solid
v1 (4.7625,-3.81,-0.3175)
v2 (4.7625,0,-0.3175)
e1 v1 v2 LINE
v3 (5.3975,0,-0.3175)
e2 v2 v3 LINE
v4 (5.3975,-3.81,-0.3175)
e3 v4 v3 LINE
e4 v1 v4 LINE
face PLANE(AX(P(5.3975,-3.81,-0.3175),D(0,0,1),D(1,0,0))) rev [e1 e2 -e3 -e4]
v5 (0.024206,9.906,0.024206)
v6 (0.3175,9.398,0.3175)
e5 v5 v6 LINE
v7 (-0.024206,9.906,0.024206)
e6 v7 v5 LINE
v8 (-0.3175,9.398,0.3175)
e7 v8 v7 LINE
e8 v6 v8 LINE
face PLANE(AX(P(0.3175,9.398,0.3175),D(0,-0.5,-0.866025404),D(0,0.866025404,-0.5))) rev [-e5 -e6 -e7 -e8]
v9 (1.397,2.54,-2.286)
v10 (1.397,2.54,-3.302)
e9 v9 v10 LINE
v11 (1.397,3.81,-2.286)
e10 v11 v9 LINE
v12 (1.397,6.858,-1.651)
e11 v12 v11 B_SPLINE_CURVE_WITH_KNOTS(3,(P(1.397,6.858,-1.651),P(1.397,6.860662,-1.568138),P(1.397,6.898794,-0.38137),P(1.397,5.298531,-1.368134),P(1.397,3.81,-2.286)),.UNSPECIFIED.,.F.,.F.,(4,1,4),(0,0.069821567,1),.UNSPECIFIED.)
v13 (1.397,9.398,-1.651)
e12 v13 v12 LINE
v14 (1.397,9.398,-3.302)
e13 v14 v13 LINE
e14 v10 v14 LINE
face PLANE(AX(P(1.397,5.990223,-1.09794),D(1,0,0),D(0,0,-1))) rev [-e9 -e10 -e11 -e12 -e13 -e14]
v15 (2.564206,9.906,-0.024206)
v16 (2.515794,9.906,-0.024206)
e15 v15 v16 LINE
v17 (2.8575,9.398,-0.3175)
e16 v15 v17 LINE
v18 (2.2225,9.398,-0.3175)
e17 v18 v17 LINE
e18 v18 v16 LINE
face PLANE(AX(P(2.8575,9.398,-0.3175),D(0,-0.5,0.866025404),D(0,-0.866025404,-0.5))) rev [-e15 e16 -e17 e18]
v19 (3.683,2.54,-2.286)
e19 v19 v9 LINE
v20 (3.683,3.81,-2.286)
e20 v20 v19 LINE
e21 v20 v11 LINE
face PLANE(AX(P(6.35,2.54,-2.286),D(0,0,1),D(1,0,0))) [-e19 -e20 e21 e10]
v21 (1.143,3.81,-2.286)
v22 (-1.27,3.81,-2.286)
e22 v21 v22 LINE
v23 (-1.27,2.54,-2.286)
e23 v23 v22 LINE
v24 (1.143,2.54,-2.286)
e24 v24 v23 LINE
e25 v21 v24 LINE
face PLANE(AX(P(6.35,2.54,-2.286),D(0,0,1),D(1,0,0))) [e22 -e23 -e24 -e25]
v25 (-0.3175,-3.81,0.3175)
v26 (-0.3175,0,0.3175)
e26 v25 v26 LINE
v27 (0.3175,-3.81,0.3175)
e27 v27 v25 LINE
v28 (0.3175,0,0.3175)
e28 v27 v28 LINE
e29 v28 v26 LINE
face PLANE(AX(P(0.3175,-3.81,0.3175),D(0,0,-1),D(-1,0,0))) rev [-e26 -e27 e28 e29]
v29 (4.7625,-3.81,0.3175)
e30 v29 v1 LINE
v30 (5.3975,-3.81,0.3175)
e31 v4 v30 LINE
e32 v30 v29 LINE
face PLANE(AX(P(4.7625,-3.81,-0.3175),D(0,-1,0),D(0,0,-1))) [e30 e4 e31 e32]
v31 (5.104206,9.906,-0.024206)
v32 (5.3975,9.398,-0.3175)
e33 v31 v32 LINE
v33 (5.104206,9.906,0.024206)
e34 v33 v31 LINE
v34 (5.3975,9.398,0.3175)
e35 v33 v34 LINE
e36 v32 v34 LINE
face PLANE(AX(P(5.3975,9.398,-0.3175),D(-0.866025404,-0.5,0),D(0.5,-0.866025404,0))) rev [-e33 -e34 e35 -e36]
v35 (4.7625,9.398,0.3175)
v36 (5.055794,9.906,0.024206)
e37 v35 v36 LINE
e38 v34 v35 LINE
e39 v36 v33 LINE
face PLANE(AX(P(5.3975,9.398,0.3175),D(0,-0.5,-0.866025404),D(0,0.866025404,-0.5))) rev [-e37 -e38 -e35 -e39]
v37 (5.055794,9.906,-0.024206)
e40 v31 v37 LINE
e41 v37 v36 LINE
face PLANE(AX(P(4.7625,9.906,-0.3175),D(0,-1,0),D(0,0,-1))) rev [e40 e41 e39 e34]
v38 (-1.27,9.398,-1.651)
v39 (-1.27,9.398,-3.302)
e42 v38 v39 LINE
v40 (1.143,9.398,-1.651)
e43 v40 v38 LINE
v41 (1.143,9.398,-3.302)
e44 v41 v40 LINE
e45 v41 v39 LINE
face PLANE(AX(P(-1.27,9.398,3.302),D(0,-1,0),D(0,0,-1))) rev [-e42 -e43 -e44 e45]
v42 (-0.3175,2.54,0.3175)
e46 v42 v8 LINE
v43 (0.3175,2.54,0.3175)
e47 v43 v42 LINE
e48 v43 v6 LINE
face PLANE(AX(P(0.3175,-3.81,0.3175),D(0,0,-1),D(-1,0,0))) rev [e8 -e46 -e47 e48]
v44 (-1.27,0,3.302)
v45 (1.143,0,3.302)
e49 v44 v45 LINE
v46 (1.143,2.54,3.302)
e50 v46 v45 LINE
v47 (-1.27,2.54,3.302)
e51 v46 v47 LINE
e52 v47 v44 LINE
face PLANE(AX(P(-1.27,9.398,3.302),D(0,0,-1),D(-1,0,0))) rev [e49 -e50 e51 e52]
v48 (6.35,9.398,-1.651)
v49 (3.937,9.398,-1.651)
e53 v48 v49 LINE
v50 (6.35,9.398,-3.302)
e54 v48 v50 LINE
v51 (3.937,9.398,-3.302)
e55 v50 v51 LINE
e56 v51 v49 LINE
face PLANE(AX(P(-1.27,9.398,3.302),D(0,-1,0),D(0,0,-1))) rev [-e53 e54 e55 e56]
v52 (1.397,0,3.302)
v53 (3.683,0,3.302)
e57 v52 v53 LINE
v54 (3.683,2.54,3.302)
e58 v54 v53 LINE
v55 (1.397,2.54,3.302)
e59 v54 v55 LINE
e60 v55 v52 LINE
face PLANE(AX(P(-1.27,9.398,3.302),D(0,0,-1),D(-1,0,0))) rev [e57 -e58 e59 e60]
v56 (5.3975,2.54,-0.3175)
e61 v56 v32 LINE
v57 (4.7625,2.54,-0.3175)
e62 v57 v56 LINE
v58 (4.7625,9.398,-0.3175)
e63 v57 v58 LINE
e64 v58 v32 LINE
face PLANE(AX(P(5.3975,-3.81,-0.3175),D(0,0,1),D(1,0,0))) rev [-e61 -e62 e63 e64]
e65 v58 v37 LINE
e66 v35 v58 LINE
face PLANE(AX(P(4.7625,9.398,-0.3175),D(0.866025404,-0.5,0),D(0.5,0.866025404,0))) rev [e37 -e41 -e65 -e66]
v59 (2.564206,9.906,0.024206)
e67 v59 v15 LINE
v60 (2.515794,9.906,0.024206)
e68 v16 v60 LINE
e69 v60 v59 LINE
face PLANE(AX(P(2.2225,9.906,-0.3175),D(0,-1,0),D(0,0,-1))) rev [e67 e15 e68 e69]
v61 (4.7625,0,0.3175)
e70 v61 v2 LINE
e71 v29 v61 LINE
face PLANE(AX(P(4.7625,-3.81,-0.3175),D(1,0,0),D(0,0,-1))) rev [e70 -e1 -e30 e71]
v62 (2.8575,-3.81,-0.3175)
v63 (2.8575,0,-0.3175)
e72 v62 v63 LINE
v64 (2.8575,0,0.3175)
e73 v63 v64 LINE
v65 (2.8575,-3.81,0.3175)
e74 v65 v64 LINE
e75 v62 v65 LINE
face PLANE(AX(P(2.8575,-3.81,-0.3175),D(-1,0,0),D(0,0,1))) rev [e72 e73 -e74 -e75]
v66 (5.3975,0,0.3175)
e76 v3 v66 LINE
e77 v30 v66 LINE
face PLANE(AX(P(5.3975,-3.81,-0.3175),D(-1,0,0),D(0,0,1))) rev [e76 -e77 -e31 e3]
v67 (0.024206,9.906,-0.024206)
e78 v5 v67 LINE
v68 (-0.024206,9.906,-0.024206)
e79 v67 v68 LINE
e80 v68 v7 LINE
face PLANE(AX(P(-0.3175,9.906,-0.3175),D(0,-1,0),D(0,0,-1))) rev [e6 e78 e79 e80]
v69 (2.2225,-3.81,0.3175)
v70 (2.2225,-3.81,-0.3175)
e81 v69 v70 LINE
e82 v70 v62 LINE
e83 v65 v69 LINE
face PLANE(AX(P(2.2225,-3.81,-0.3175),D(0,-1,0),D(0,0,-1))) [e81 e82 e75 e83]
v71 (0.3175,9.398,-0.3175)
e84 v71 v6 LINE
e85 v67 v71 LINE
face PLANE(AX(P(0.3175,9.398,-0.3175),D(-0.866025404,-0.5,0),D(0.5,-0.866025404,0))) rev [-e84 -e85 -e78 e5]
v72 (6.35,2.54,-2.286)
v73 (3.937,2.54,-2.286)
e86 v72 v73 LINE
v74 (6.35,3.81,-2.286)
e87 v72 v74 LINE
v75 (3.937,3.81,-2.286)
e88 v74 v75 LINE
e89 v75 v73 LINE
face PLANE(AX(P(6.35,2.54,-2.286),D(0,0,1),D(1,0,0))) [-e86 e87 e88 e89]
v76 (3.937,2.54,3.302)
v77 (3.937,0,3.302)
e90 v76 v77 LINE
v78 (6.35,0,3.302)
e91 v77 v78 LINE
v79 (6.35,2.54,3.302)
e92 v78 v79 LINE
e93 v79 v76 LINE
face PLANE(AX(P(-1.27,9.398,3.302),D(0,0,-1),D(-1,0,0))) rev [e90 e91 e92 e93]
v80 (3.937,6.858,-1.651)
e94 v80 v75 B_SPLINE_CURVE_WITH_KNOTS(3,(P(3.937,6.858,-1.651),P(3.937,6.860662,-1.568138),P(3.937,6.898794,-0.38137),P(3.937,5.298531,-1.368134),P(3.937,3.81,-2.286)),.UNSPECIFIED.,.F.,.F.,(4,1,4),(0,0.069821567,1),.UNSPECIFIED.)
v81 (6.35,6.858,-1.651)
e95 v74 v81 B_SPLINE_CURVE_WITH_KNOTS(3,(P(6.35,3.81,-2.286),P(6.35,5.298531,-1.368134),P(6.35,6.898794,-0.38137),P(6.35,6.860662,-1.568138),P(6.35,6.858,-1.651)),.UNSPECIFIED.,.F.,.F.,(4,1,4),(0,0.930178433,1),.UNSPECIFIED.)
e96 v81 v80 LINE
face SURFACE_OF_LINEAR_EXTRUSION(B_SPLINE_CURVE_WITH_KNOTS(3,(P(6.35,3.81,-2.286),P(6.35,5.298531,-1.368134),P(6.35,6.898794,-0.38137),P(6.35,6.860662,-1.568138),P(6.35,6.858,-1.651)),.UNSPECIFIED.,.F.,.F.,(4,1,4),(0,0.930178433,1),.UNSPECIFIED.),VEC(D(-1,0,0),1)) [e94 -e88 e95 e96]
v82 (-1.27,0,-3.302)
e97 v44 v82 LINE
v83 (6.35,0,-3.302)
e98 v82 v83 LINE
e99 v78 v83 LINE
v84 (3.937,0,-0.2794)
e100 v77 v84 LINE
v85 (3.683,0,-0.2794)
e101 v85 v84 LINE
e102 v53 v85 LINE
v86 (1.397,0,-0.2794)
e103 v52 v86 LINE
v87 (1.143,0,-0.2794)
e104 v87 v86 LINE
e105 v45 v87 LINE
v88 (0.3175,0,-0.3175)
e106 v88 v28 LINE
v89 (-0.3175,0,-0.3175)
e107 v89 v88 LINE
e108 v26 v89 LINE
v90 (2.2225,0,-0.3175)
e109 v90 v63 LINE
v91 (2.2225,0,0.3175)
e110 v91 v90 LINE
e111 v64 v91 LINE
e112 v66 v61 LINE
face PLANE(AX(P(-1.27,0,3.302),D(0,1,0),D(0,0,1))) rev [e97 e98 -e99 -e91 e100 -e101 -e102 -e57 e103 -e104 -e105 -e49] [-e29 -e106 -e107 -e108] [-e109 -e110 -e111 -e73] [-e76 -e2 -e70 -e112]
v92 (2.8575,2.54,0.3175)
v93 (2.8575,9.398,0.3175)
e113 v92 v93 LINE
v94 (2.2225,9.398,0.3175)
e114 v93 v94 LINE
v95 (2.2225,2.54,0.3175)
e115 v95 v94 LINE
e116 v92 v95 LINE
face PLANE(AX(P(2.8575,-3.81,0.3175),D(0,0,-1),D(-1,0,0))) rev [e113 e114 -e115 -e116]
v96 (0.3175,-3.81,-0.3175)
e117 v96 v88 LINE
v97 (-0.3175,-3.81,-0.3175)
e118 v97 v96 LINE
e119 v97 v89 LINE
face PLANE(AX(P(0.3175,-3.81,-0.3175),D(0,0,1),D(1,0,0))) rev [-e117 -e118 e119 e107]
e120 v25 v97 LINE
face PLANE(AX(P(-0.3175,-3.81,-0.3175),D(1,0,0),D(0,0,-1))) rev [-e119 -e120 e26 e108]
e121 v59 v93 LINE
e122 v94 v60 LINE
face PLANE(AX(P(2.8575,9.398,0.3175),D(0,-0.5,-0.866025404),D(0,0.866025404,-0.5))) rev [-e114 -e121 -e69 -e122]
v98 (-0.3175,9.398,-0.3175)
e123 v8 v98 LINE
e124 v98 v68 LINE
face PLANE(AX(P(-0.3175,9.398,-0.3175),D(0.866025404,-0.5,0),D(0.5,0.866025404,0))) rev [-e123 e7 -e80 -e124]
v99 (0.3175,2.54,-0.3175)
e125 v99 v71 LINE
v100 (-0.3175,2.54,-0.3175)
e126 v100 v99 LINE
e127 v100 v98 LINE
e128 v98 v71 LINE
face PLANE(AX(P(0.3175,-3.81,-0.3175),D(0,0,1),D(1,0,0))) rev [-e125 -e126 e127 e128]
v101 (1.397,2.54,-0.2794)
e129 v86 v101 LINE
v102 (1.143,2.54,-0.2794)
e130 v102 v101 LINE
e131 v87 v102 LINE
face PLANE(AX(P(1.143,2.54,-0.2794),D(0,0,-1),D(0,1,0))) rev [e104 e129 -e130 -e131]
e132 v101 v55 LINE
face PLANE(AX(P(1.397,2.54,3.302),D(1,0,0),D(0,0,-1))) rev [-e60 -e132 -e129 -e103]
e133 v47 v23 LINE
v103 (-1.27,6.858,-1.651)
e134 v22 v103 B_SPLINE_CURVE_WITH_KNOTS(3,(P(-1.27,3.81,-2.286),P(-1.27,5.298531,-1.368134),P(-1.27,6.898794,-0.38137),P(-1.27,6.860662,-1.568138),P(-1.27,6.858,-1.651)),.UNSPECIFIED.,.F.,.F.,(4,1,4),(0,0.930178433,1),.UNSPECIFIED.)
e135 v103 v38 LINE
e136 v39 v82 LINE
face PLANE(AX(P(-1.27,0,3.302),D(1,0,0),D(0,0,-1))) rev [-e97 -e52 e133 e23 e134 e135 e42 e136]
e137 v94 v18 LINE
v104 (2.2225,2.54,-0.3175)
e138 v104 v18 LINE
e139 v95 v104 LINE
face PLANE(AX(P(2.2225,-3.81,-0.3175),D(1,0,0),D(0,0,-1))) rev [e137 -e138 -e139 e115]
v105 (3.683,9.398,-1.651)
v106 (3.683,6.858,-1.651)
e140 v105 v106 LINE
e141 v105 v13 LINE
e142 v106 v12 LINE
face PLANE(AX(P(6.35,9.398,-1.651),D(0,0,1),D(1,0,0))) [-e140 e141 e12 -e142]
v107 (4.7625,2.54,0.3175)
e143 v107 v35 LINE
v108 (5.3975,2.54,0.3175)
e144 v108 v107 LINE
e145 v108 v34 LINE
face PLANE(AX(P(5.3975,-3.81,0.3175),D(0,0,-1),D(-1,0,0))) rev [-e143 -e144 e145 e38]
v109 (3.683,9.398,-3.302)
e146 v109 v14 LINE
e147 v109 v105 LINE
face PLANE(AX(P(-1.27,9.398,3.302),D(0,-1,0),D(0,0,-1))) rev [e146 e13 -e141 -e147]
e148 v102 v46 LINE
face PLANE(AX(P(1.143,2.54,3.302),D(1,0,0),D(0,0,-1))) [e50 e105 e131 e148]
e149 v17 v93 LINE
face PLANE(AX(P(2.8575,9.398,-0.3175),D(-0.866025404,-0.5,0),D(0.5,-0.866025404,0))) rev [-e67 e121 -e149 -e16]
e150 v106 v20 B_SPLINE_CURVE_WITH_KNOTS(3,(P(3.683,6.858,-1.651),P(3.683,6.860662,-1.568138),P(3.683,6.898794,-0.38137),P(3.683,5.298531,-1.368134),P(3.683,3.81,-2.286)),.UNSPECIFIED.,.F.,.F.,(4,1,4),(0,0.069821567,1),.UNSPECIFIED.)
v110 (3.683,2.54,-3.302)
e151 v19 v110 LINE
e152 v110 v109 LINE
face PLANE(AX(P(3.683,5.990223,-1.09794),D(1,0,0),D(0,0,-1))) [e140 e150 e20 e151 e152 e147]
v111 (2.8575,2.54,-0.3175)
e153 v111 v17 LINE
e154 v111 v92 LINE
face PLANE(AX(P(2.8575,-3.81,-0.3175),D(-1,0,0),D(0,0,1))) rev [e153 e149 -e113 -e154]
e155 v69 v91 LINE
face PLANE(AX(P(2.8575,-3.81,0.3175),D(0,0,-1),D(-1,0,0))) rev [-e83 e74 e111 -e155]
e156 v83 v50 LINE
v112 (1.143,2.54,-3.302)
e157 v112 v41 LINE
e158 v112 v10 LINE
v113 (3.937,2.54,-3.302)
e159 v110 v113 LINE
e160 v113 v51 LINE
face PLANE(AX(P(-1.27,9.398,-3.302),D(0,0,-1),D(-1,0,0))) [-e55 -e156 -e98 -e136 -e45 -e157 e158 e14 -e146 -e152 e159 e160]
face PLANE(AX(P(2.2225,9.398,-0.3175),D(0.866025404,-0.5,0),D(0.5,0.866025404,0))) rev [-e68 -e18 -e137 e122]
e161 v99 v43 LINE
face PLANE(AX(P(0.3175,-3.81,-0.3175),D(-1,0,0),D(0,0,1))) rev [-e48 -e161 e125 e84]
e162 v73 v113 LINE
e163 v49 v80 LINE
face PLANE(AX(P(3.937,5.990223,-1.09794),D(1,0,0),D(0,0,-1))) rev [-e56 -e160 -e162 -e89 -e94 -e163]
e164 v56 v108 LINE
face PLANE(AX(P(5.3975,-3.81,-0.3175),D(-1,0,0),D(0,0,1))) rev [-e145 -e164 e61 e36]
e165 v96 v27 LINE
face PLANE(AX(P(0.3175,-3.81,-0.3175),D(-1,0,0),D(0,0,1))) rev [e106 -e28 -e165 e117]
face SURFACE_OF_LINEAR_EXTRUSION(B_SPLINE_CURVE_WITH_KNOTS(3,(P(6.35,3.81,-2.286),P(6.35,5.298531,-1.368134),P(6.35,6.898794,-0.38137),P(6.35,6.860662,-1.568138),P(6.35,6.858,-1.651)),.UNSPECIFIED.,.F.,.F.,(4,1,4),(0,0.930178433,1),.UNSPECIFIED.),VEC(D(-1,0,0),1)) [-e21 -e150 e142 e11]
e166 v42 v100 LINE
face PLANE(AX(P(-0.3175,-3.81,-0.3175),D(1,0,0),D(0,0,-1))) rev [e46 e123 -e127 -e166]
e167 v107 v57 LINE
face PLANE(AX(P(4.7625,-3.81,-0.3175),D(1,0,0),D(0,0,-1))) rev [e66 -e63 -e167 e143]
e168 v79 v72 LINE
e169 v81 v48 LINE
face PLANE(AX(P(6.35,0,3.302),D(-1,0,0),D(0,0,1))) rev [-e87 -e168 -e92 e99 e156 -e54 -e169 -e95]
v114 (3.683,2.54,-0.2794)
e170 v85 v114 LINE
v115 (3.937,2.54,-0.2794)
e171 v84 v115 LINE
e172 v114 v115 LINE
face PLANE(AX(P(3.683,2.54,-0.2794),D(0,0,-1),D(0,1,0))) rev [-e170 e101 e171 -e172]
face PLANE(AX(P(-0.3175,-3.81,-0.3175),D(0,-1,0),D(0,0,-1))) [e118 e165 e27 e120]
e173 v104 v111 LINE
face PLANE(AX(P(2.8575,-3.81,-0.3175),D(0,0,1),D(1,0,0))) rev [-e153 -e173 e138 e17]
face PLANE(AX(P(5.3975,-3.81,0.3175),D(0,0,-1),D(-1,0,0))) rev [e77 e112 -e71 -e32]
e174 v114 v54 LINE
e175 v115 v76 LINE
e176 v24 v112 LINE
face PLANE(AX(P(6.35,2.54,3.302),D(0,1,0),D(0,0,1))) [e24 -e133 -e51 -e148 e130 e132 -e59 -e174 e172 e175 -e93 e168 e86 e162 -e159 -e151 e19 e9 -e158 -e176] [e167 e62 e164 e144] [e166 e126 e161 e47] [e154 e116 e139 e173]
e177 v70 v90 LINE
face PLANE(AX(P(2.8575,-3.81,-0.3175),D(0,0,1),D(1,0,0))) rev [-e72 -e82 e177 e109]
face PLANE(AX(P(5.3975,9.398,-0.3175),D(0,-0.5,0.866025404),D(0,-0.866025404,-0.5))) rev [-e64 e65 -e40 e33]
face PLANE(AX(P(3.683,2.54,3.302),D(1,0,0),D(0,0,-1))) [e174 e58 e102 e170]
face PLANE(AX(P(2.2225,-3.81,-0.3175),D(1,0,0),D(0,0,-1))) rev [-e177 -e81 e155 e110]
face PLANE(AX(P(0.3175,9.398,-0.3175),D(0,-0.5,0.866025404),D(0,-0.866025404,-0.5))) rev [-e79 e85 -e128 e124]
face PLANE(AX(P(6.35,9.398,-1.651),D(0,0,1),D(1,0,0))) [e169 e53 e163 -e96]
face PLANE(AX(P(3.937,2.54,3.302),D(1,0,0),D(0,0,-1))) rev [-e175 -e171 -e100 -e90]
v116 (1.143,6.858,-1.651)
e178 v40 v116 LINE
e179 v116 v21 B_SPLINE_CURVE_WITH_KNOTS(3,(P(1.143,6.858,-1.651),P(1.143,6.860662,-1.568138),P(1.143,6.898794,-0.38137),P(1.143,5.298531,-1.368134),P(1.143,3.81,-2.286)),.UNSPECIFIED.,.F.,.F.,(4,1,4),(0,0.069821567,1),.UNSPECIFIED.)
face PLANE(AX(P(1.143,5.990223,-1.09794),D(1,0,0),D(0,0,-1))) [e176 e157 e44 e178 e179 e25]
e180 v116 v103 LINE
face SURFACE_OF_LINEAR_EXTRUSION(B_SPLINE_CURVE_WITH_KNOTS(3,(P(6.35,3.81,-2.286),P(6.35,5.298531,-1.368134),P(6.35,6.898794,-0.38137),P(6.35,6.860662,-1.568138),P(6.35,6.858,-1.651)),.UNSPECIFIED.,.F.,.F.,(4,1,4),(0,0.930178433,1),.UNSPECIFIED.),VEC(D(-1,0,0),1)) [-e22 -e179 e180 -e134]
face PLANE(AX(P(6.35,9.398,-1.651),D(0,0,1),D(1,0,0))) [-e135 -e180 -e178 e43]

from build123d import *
from OCP.BRepFilletAPI import BRepFilletAPI_MakeChamfer

# Parameters (mm, degrees)
BASE_EXTRUDE_DEPTH          = 3.302
BASE_EXTRUDE_DEPTH_BACK     = 3.302
SKETCH3_W                   = 7.62
SKETCH3_H                   = 9.398
CUT_EXTRUDE1_START          = -7.62
CUT_EXTRUDE1_DEPTH          = 7.62
SKETCH5_W                   = 3.5814
SKETCH5_H                   = 2.54
CUT_EXTRUDE2_DEPTH          = 0.127
BOSS_EXTRUDE1_START         = -9.906
SKETCH6_W                   = 0.635
SKETCH6_H                   = 0.635
BOSS_EXTRUDE1_DEPTH         = 13.716
CHAMFER1_SIZE               = 0.508
CHAMFER1_SIZE2              = 0.293293937
LPATTERN2_COUNT             = 3
LPATTERN2_PITCH             = 2.54
CHAMFER1_OF_LPATTERN2_SIZE  = 0.508
CHAMFER1_OF_LPATTERN2_SIZE2 = 0.293293937
LPATTERN3_COUNT             = 2
LPATTERN3_PITCH             = 2.54


# Read off the part's stored shape, not the designer's step: Cut-Extrude1
with BuildPart() as part:
    # Sketch3 → Base-Extrude (new, two sides: drawn at the far end of the back side and taken through both)
    with BuildSketch(Plane.XY.offset(-BASE_EXTRUDE_DEPTH_BACK)):
        with Locations((2.54, 4.699)):
            Rectangle(SKETCH3_W, SKETCH3_H)
    extrude(amount=BASE_EXTRUDE_DEPTH + BASE_EXTRUDE_DEPTH_BACK)

    # Cut-Extrude1 outline → Cut-Extrude1 (cut)
    with BuildSketch(Plane.ZY.offset(1.27).offset(CUT_EXTRUDE1_START)):
        with BuildLine():
            add(Edge.make_bspline(
                [(-2.286, 3.81), (-1.368133743, 5.298530644), (-0.381370103, 6.898794196), (-1.568138006, 6.86066242), (-1.651, 6.858)],
                knots=[0, 0, 0, 0, 0.930178433, 1, 1, 1, 1], degree=3))
            Line((-2.286, 3.81), (-2.286, 2.54))
            Line((-2.286, 2.54), (3.302, 2.54))
            Line((3.302, 2.54), (3.302, 9.398))
            Line((3.302, 9.398), (-1.651, 9.398))
            Line((-1.651, 9.398), (-1.651, 6.858))
        make_face()
    extrude(amount=CUT_EXTRUDE1_DEPTH, mode=Mode.SUBTRACT)

    # Sketch5 → Cut-Extrude2 (cut, symmetric)
    with BuildSketch(Plane(origin=(1.27, 0, 0), x_dir=(0, 0, -1), z_dir=(1, 0, 0))):
        with Locations((-1.5113, 1.27)):
            Rectangle(SKETCH5_W, SKETCH5_H)
        with BuildLine():
            Line((3.302, 2.54), (3.302, 9.398))
            Line((3.302, 9.398), (1.651, 9.398))
            Line((1.651, 9.398), (1.651, 6.858))
            add(Edge.make_bspline(
                [(2.286, 3.81), (1.368133743, 5.298530644), (0.381370103, 6.898794196), (1.568138006, 6.86066242), (1.651, 6.858)],
                knots=[0, 0, 0, 0, 0.930178433, 1, 1, 1, 1], degree=3))
            Line((2.286, 3.81), (2.286, 2.54))
            Line((2.286, 2.54), (3.302, 2.54))
        make_face()
    cut_extrude2 = extrude(amount=CUT_EXTRUDE2_DEPTH, both=True, mode=Mode.SUBTRACT)

    # Sketch6 → Boss-Extrude1 (add)
    with BuildSketch(Plane.XZ.offset(BOSS_EXTRUDE1_START)):
        Rectangle(SKETCH6_W, SKETCH6_H)
    boss_extrude1 = extrude(amount=BOSS_EXTRUDE1_DEPTH)

    # Chamfer1: one chamfer whose edges measure the first distance from different faces: ONE call of the kernel's chamfer builder (chamfer() names one face for all edges)
    chamfer1_edges_1 = [part.edges().sort_by_distance(p)[0] for p in [
        (-0.3175, 9.906, 0),
    ]]
    chamfer1_side_1 = [part.faces().sort_by_distance(p)[0] for p in [
        (-0.3175, 6.223, 0),
    ]]
    chamfer1_edges_2 = [part.edges().sort_by_distance(p)[0] for p in [
        (0, 9.906, -0.3175),
    ]]
    chamfer1_side_2 = [part.faces().sort_by_distance(p)[0] for p in [
        (0, 6.223, -0.3175),
    ]]
    chamfer1_edges_3 = [part.edges().sort_by_distance(p)[0] for p in [
        (0.3175, 9.906, 0),
    ]]
    chamfer1_side_3 = [part.faces().sort_by_distance(p)[0] for p in [
        (0.3175, 6.223, 0),
    ]]
    chamfer1_edges_4 = [part.edges().sort_by_distance(p)[0] for p in [
        (0, 9.906, 0.3175),
    ]]
    chamfer1_side_4 = [part.faces().sort_by_distance(p)[0] for p in [
        (0, 6.223, 0.3175),
    ]]
    chamfer1 = BRepFilletAPI_MakeChamfer(part.part.solid().wrapped)
    for e in chamfer1_edges_1:
        chamfer1.Add(CHAMFER1_SIZE, CHAMFER1_SIZE2, e.wrapped, chamfer1_side_1[0].wrapped)  # the first distance lies on this face
    for e in chamfer1_edges_2:
        chamfer1.Add(CHAMFER1_SIZE, CHAMFER1_SIZE2, e.wrapped, chamfer1_side_2[0].wrapped)  # the first distance lies on this face
    for e in chamfer1_edges_3:
        chamfer1.Add(CHAMFER1_SIZE, CHAMFER1_SIZE2, e.wrapped, chamfer1_side_3[0].wrapped)  # the first distance lies on this face
    for e in chamfer1_edges_4:
        chamfer1.Add(CHAMFER1_SIZE, CHAMFER1_SIZE2, e.wrapped, chamfer1_side_4[0].wrapped)  # the first distance lies on this face
    add(Compound.cast(chamfer1.Shape()), mode=Mode.REPLACE)

    # LPattern2: Boss-Extrude1 ×3
    with Locations(*[(i * LPATTERN2_PITCH, 0, 0) for i in range(1, LPATTERN2_COUNT)]):
        add(boss_extrude1)

    # Chamfer1 of LPattern2: one chamfer whose edges measure the first distance from different faces: ONE call of the kernel's chamfer builder (chamfer() names one face for all edges)
    chamfer1_of_lpattern2_edges_1 = [part.edges().sort_by_distance(p)[0] for p in [
        (2.2225, 9.906, 0),
    ]]
    chamfer1_of_lpattern2_side_1 = [part.faces().sort_by_distance(p)[0] for p in [
        (2.2225, 6.223, 0),
    ]]
    chamfer1_of_lpattern2_edges_2 = [part.edges().sort_by_distance(p)[0] for p in [
        (2.54, 9.906, -0.3175),
    ]]
    chamfer1_of_lpattern2_side_2 = [part.faces().sort_by_distance(p)[0] for p in [
        (2.54, 6.223, -0.3175),
    ]]
    chamfer1_of_lpattern2_edges_3 = [part.edges().sort_by_distance(p)[0] for p in [
        (2.8575, 9.906, 0),
    ]]
    chamfer1_of_lpattern2_side_3 = [part.faces().sort_by_distance(p)[0] for p in [
        (2.8575, 6.223, 0),
    ]]
    chamfer1_of_lpattern2_edges_4 = [part.edges().sort_by_distance(p)[0] for p in [
        (2.54, 9.906, 0.3175),
    ]]
    chamfer1_of_lpattern2_side_4 = [part.faces().sort_by_distance(p)[0] for p in [
        (2.54, 6.223, 0.3175),
    ]]
    chamfer1_of_lpattern2_edges_5 = [part.edges().sort_by_distance(p)[0] for p in [
        (4.7625, 9.906, 0),
    ]]
    chamfer1_of_lpattern2_side_5 = [part.faces().sort_by_distance(p)[0] for p in [
        (4.7625, 6.223, 0),
    ]]
    chamfer1_of_lpattern2_edges_6 = [part.edges().sort_by_distance(p)[0] for p in [
        (5.08, 9.906, -0.3175),
    ]]
    chamfer1_of_lpattern2_side_6 = [part.faces().sort_by_distance(p)[0] for p in [
        (5.08, 6.223, -0.3175),
    ]]
    chamfer1_of_lpattern2_edges_7 = [part.edges().sort_by_distance(p)[0] for p in [
        (5.3975, 9.906, 0),
    ]]
    chamfer1_of_lpattern2_side_7 = [part.faces().sort_by_distance(p)[0] for p in [
        (5.3975, 6.223, 0),
    ]]
    chamfer1_of_lpattern2_edges_8 = [part.edges().sort_by_distance(p)[0] for p in [
        (5.08, 9.906, 0.3175),
    ]]
    chamfer1_of_lpattern2_side_8 = [part.faces().sort_by_distance(p)[0] for p in [
        (5.08, 6.223, 0.3175),
    ]]
    chamfer1_of_lpattern2 = BRepFilletAPI_MakeChamfer(part.part.solid().wrapped)
    for e in chamfer1_of_lpattern2_edges_1:
        chamfer1_of_lpattern2.Add(CHAMFER1_OF_LPATTERN2_SIZE, CHAMFER1_OF_LPATTERN2_SIZE2, e.wrapped, chamfer1_of_lpattern2_side_1[0].wrapped)  # the first distance lies on this face
    for e in chamfer1_of_lpattern2_edges_2:
        chamfer1_of_lpattern2.Add(CHAMFER1_OF_LPATTERN2_SIZE, CHAMFER1_OF_LPATTERN2_SIZE2, e.wrapped, chamfer1_of_lpattern2_side_2[0].wrapped)  # the first distance lies on this face
    for e in chamfer1_of_lpattern2_edges_3:
        chamfer1_of_lpattern2.Add(CHAMFER1_OF_LPATTERN2_SIZE, CHAMFER1_OF_LPATTERN2_SIZE2, e.wrapped, chamfer1_of_lpattern2_side_3[0].wrapped)  # the first distance lies on this face
    for e in chamfer1_of_lpattern2_edges_4:
        chamfer1_of_lpattern2.Add(CHAMFER1_OF_LPATTERN2_SIZE, CHAMFER1_OF_LPATTERN2_SIZE2, e.wrapped, chamfer1_of_lpattern2_side_4[0].wrapped)  # the first distance lies on this face
    for e in chamfer1_of_lpattern2_edges_5:
        chamfer1_of_lpattern2.Add(CHAMFER1_OF_LPATTERN2_SIZE, CHAMFER1_OF_LPATTERN2_SIZE2, e.wrapped, chamfer1_of_lpattern2_side_5[0].wrapped)  # the first distance lies on this face
    for e in chamfer1_of_lpattern2_edges_6:
        chamfer1_of_lpattern2.Add(CHAMFER1_OF_LPATTERN2_SIZE, CHAMFER1_OF_LPATTERN2_SIZE2, e.wrapped, chamfer1_of_lpattern2_side_6[0].wrapped)  # the first distance lies on this face
    for e in chamfer1_of_lpattern2_edges_7:
        chamfer1_of_lpattern2.Add(CHAMFER1_OF_LPATTERN2_SIZE, CHAMFER1_OF_LPATTERN2_SIZE2, e.wrapped, chamfer1_of_lpattern2_side_7[0].wrapped)  # the first distance lies on this face
    for e in chamfer1_of_lpattern2_edges_8:
        chamfer1_of_lpattern2.Add(CHAMFER1_OF_LPATTERN2_SIZE, CHAMFER1_OF_LPATTERN2_SIZE2, e.wrapped, chamfer1_of_lpattern2_side_8[0].wrapped)  # the first distance lies on this face
    add(Compound.cast(chamfer1_of_lpattern2.Shape()), mode=Mode.REPLACE)

    # LPattern3: Cut-Extrude2 ×2
    with Locations(*[(i * LPATTERN3_PITCH, 0, 0) for i in range(1, LPATTERN3_COUNT)]):
        add(cut_extrude2, mode=Mode.SUBTRACT)


solid = part.part
